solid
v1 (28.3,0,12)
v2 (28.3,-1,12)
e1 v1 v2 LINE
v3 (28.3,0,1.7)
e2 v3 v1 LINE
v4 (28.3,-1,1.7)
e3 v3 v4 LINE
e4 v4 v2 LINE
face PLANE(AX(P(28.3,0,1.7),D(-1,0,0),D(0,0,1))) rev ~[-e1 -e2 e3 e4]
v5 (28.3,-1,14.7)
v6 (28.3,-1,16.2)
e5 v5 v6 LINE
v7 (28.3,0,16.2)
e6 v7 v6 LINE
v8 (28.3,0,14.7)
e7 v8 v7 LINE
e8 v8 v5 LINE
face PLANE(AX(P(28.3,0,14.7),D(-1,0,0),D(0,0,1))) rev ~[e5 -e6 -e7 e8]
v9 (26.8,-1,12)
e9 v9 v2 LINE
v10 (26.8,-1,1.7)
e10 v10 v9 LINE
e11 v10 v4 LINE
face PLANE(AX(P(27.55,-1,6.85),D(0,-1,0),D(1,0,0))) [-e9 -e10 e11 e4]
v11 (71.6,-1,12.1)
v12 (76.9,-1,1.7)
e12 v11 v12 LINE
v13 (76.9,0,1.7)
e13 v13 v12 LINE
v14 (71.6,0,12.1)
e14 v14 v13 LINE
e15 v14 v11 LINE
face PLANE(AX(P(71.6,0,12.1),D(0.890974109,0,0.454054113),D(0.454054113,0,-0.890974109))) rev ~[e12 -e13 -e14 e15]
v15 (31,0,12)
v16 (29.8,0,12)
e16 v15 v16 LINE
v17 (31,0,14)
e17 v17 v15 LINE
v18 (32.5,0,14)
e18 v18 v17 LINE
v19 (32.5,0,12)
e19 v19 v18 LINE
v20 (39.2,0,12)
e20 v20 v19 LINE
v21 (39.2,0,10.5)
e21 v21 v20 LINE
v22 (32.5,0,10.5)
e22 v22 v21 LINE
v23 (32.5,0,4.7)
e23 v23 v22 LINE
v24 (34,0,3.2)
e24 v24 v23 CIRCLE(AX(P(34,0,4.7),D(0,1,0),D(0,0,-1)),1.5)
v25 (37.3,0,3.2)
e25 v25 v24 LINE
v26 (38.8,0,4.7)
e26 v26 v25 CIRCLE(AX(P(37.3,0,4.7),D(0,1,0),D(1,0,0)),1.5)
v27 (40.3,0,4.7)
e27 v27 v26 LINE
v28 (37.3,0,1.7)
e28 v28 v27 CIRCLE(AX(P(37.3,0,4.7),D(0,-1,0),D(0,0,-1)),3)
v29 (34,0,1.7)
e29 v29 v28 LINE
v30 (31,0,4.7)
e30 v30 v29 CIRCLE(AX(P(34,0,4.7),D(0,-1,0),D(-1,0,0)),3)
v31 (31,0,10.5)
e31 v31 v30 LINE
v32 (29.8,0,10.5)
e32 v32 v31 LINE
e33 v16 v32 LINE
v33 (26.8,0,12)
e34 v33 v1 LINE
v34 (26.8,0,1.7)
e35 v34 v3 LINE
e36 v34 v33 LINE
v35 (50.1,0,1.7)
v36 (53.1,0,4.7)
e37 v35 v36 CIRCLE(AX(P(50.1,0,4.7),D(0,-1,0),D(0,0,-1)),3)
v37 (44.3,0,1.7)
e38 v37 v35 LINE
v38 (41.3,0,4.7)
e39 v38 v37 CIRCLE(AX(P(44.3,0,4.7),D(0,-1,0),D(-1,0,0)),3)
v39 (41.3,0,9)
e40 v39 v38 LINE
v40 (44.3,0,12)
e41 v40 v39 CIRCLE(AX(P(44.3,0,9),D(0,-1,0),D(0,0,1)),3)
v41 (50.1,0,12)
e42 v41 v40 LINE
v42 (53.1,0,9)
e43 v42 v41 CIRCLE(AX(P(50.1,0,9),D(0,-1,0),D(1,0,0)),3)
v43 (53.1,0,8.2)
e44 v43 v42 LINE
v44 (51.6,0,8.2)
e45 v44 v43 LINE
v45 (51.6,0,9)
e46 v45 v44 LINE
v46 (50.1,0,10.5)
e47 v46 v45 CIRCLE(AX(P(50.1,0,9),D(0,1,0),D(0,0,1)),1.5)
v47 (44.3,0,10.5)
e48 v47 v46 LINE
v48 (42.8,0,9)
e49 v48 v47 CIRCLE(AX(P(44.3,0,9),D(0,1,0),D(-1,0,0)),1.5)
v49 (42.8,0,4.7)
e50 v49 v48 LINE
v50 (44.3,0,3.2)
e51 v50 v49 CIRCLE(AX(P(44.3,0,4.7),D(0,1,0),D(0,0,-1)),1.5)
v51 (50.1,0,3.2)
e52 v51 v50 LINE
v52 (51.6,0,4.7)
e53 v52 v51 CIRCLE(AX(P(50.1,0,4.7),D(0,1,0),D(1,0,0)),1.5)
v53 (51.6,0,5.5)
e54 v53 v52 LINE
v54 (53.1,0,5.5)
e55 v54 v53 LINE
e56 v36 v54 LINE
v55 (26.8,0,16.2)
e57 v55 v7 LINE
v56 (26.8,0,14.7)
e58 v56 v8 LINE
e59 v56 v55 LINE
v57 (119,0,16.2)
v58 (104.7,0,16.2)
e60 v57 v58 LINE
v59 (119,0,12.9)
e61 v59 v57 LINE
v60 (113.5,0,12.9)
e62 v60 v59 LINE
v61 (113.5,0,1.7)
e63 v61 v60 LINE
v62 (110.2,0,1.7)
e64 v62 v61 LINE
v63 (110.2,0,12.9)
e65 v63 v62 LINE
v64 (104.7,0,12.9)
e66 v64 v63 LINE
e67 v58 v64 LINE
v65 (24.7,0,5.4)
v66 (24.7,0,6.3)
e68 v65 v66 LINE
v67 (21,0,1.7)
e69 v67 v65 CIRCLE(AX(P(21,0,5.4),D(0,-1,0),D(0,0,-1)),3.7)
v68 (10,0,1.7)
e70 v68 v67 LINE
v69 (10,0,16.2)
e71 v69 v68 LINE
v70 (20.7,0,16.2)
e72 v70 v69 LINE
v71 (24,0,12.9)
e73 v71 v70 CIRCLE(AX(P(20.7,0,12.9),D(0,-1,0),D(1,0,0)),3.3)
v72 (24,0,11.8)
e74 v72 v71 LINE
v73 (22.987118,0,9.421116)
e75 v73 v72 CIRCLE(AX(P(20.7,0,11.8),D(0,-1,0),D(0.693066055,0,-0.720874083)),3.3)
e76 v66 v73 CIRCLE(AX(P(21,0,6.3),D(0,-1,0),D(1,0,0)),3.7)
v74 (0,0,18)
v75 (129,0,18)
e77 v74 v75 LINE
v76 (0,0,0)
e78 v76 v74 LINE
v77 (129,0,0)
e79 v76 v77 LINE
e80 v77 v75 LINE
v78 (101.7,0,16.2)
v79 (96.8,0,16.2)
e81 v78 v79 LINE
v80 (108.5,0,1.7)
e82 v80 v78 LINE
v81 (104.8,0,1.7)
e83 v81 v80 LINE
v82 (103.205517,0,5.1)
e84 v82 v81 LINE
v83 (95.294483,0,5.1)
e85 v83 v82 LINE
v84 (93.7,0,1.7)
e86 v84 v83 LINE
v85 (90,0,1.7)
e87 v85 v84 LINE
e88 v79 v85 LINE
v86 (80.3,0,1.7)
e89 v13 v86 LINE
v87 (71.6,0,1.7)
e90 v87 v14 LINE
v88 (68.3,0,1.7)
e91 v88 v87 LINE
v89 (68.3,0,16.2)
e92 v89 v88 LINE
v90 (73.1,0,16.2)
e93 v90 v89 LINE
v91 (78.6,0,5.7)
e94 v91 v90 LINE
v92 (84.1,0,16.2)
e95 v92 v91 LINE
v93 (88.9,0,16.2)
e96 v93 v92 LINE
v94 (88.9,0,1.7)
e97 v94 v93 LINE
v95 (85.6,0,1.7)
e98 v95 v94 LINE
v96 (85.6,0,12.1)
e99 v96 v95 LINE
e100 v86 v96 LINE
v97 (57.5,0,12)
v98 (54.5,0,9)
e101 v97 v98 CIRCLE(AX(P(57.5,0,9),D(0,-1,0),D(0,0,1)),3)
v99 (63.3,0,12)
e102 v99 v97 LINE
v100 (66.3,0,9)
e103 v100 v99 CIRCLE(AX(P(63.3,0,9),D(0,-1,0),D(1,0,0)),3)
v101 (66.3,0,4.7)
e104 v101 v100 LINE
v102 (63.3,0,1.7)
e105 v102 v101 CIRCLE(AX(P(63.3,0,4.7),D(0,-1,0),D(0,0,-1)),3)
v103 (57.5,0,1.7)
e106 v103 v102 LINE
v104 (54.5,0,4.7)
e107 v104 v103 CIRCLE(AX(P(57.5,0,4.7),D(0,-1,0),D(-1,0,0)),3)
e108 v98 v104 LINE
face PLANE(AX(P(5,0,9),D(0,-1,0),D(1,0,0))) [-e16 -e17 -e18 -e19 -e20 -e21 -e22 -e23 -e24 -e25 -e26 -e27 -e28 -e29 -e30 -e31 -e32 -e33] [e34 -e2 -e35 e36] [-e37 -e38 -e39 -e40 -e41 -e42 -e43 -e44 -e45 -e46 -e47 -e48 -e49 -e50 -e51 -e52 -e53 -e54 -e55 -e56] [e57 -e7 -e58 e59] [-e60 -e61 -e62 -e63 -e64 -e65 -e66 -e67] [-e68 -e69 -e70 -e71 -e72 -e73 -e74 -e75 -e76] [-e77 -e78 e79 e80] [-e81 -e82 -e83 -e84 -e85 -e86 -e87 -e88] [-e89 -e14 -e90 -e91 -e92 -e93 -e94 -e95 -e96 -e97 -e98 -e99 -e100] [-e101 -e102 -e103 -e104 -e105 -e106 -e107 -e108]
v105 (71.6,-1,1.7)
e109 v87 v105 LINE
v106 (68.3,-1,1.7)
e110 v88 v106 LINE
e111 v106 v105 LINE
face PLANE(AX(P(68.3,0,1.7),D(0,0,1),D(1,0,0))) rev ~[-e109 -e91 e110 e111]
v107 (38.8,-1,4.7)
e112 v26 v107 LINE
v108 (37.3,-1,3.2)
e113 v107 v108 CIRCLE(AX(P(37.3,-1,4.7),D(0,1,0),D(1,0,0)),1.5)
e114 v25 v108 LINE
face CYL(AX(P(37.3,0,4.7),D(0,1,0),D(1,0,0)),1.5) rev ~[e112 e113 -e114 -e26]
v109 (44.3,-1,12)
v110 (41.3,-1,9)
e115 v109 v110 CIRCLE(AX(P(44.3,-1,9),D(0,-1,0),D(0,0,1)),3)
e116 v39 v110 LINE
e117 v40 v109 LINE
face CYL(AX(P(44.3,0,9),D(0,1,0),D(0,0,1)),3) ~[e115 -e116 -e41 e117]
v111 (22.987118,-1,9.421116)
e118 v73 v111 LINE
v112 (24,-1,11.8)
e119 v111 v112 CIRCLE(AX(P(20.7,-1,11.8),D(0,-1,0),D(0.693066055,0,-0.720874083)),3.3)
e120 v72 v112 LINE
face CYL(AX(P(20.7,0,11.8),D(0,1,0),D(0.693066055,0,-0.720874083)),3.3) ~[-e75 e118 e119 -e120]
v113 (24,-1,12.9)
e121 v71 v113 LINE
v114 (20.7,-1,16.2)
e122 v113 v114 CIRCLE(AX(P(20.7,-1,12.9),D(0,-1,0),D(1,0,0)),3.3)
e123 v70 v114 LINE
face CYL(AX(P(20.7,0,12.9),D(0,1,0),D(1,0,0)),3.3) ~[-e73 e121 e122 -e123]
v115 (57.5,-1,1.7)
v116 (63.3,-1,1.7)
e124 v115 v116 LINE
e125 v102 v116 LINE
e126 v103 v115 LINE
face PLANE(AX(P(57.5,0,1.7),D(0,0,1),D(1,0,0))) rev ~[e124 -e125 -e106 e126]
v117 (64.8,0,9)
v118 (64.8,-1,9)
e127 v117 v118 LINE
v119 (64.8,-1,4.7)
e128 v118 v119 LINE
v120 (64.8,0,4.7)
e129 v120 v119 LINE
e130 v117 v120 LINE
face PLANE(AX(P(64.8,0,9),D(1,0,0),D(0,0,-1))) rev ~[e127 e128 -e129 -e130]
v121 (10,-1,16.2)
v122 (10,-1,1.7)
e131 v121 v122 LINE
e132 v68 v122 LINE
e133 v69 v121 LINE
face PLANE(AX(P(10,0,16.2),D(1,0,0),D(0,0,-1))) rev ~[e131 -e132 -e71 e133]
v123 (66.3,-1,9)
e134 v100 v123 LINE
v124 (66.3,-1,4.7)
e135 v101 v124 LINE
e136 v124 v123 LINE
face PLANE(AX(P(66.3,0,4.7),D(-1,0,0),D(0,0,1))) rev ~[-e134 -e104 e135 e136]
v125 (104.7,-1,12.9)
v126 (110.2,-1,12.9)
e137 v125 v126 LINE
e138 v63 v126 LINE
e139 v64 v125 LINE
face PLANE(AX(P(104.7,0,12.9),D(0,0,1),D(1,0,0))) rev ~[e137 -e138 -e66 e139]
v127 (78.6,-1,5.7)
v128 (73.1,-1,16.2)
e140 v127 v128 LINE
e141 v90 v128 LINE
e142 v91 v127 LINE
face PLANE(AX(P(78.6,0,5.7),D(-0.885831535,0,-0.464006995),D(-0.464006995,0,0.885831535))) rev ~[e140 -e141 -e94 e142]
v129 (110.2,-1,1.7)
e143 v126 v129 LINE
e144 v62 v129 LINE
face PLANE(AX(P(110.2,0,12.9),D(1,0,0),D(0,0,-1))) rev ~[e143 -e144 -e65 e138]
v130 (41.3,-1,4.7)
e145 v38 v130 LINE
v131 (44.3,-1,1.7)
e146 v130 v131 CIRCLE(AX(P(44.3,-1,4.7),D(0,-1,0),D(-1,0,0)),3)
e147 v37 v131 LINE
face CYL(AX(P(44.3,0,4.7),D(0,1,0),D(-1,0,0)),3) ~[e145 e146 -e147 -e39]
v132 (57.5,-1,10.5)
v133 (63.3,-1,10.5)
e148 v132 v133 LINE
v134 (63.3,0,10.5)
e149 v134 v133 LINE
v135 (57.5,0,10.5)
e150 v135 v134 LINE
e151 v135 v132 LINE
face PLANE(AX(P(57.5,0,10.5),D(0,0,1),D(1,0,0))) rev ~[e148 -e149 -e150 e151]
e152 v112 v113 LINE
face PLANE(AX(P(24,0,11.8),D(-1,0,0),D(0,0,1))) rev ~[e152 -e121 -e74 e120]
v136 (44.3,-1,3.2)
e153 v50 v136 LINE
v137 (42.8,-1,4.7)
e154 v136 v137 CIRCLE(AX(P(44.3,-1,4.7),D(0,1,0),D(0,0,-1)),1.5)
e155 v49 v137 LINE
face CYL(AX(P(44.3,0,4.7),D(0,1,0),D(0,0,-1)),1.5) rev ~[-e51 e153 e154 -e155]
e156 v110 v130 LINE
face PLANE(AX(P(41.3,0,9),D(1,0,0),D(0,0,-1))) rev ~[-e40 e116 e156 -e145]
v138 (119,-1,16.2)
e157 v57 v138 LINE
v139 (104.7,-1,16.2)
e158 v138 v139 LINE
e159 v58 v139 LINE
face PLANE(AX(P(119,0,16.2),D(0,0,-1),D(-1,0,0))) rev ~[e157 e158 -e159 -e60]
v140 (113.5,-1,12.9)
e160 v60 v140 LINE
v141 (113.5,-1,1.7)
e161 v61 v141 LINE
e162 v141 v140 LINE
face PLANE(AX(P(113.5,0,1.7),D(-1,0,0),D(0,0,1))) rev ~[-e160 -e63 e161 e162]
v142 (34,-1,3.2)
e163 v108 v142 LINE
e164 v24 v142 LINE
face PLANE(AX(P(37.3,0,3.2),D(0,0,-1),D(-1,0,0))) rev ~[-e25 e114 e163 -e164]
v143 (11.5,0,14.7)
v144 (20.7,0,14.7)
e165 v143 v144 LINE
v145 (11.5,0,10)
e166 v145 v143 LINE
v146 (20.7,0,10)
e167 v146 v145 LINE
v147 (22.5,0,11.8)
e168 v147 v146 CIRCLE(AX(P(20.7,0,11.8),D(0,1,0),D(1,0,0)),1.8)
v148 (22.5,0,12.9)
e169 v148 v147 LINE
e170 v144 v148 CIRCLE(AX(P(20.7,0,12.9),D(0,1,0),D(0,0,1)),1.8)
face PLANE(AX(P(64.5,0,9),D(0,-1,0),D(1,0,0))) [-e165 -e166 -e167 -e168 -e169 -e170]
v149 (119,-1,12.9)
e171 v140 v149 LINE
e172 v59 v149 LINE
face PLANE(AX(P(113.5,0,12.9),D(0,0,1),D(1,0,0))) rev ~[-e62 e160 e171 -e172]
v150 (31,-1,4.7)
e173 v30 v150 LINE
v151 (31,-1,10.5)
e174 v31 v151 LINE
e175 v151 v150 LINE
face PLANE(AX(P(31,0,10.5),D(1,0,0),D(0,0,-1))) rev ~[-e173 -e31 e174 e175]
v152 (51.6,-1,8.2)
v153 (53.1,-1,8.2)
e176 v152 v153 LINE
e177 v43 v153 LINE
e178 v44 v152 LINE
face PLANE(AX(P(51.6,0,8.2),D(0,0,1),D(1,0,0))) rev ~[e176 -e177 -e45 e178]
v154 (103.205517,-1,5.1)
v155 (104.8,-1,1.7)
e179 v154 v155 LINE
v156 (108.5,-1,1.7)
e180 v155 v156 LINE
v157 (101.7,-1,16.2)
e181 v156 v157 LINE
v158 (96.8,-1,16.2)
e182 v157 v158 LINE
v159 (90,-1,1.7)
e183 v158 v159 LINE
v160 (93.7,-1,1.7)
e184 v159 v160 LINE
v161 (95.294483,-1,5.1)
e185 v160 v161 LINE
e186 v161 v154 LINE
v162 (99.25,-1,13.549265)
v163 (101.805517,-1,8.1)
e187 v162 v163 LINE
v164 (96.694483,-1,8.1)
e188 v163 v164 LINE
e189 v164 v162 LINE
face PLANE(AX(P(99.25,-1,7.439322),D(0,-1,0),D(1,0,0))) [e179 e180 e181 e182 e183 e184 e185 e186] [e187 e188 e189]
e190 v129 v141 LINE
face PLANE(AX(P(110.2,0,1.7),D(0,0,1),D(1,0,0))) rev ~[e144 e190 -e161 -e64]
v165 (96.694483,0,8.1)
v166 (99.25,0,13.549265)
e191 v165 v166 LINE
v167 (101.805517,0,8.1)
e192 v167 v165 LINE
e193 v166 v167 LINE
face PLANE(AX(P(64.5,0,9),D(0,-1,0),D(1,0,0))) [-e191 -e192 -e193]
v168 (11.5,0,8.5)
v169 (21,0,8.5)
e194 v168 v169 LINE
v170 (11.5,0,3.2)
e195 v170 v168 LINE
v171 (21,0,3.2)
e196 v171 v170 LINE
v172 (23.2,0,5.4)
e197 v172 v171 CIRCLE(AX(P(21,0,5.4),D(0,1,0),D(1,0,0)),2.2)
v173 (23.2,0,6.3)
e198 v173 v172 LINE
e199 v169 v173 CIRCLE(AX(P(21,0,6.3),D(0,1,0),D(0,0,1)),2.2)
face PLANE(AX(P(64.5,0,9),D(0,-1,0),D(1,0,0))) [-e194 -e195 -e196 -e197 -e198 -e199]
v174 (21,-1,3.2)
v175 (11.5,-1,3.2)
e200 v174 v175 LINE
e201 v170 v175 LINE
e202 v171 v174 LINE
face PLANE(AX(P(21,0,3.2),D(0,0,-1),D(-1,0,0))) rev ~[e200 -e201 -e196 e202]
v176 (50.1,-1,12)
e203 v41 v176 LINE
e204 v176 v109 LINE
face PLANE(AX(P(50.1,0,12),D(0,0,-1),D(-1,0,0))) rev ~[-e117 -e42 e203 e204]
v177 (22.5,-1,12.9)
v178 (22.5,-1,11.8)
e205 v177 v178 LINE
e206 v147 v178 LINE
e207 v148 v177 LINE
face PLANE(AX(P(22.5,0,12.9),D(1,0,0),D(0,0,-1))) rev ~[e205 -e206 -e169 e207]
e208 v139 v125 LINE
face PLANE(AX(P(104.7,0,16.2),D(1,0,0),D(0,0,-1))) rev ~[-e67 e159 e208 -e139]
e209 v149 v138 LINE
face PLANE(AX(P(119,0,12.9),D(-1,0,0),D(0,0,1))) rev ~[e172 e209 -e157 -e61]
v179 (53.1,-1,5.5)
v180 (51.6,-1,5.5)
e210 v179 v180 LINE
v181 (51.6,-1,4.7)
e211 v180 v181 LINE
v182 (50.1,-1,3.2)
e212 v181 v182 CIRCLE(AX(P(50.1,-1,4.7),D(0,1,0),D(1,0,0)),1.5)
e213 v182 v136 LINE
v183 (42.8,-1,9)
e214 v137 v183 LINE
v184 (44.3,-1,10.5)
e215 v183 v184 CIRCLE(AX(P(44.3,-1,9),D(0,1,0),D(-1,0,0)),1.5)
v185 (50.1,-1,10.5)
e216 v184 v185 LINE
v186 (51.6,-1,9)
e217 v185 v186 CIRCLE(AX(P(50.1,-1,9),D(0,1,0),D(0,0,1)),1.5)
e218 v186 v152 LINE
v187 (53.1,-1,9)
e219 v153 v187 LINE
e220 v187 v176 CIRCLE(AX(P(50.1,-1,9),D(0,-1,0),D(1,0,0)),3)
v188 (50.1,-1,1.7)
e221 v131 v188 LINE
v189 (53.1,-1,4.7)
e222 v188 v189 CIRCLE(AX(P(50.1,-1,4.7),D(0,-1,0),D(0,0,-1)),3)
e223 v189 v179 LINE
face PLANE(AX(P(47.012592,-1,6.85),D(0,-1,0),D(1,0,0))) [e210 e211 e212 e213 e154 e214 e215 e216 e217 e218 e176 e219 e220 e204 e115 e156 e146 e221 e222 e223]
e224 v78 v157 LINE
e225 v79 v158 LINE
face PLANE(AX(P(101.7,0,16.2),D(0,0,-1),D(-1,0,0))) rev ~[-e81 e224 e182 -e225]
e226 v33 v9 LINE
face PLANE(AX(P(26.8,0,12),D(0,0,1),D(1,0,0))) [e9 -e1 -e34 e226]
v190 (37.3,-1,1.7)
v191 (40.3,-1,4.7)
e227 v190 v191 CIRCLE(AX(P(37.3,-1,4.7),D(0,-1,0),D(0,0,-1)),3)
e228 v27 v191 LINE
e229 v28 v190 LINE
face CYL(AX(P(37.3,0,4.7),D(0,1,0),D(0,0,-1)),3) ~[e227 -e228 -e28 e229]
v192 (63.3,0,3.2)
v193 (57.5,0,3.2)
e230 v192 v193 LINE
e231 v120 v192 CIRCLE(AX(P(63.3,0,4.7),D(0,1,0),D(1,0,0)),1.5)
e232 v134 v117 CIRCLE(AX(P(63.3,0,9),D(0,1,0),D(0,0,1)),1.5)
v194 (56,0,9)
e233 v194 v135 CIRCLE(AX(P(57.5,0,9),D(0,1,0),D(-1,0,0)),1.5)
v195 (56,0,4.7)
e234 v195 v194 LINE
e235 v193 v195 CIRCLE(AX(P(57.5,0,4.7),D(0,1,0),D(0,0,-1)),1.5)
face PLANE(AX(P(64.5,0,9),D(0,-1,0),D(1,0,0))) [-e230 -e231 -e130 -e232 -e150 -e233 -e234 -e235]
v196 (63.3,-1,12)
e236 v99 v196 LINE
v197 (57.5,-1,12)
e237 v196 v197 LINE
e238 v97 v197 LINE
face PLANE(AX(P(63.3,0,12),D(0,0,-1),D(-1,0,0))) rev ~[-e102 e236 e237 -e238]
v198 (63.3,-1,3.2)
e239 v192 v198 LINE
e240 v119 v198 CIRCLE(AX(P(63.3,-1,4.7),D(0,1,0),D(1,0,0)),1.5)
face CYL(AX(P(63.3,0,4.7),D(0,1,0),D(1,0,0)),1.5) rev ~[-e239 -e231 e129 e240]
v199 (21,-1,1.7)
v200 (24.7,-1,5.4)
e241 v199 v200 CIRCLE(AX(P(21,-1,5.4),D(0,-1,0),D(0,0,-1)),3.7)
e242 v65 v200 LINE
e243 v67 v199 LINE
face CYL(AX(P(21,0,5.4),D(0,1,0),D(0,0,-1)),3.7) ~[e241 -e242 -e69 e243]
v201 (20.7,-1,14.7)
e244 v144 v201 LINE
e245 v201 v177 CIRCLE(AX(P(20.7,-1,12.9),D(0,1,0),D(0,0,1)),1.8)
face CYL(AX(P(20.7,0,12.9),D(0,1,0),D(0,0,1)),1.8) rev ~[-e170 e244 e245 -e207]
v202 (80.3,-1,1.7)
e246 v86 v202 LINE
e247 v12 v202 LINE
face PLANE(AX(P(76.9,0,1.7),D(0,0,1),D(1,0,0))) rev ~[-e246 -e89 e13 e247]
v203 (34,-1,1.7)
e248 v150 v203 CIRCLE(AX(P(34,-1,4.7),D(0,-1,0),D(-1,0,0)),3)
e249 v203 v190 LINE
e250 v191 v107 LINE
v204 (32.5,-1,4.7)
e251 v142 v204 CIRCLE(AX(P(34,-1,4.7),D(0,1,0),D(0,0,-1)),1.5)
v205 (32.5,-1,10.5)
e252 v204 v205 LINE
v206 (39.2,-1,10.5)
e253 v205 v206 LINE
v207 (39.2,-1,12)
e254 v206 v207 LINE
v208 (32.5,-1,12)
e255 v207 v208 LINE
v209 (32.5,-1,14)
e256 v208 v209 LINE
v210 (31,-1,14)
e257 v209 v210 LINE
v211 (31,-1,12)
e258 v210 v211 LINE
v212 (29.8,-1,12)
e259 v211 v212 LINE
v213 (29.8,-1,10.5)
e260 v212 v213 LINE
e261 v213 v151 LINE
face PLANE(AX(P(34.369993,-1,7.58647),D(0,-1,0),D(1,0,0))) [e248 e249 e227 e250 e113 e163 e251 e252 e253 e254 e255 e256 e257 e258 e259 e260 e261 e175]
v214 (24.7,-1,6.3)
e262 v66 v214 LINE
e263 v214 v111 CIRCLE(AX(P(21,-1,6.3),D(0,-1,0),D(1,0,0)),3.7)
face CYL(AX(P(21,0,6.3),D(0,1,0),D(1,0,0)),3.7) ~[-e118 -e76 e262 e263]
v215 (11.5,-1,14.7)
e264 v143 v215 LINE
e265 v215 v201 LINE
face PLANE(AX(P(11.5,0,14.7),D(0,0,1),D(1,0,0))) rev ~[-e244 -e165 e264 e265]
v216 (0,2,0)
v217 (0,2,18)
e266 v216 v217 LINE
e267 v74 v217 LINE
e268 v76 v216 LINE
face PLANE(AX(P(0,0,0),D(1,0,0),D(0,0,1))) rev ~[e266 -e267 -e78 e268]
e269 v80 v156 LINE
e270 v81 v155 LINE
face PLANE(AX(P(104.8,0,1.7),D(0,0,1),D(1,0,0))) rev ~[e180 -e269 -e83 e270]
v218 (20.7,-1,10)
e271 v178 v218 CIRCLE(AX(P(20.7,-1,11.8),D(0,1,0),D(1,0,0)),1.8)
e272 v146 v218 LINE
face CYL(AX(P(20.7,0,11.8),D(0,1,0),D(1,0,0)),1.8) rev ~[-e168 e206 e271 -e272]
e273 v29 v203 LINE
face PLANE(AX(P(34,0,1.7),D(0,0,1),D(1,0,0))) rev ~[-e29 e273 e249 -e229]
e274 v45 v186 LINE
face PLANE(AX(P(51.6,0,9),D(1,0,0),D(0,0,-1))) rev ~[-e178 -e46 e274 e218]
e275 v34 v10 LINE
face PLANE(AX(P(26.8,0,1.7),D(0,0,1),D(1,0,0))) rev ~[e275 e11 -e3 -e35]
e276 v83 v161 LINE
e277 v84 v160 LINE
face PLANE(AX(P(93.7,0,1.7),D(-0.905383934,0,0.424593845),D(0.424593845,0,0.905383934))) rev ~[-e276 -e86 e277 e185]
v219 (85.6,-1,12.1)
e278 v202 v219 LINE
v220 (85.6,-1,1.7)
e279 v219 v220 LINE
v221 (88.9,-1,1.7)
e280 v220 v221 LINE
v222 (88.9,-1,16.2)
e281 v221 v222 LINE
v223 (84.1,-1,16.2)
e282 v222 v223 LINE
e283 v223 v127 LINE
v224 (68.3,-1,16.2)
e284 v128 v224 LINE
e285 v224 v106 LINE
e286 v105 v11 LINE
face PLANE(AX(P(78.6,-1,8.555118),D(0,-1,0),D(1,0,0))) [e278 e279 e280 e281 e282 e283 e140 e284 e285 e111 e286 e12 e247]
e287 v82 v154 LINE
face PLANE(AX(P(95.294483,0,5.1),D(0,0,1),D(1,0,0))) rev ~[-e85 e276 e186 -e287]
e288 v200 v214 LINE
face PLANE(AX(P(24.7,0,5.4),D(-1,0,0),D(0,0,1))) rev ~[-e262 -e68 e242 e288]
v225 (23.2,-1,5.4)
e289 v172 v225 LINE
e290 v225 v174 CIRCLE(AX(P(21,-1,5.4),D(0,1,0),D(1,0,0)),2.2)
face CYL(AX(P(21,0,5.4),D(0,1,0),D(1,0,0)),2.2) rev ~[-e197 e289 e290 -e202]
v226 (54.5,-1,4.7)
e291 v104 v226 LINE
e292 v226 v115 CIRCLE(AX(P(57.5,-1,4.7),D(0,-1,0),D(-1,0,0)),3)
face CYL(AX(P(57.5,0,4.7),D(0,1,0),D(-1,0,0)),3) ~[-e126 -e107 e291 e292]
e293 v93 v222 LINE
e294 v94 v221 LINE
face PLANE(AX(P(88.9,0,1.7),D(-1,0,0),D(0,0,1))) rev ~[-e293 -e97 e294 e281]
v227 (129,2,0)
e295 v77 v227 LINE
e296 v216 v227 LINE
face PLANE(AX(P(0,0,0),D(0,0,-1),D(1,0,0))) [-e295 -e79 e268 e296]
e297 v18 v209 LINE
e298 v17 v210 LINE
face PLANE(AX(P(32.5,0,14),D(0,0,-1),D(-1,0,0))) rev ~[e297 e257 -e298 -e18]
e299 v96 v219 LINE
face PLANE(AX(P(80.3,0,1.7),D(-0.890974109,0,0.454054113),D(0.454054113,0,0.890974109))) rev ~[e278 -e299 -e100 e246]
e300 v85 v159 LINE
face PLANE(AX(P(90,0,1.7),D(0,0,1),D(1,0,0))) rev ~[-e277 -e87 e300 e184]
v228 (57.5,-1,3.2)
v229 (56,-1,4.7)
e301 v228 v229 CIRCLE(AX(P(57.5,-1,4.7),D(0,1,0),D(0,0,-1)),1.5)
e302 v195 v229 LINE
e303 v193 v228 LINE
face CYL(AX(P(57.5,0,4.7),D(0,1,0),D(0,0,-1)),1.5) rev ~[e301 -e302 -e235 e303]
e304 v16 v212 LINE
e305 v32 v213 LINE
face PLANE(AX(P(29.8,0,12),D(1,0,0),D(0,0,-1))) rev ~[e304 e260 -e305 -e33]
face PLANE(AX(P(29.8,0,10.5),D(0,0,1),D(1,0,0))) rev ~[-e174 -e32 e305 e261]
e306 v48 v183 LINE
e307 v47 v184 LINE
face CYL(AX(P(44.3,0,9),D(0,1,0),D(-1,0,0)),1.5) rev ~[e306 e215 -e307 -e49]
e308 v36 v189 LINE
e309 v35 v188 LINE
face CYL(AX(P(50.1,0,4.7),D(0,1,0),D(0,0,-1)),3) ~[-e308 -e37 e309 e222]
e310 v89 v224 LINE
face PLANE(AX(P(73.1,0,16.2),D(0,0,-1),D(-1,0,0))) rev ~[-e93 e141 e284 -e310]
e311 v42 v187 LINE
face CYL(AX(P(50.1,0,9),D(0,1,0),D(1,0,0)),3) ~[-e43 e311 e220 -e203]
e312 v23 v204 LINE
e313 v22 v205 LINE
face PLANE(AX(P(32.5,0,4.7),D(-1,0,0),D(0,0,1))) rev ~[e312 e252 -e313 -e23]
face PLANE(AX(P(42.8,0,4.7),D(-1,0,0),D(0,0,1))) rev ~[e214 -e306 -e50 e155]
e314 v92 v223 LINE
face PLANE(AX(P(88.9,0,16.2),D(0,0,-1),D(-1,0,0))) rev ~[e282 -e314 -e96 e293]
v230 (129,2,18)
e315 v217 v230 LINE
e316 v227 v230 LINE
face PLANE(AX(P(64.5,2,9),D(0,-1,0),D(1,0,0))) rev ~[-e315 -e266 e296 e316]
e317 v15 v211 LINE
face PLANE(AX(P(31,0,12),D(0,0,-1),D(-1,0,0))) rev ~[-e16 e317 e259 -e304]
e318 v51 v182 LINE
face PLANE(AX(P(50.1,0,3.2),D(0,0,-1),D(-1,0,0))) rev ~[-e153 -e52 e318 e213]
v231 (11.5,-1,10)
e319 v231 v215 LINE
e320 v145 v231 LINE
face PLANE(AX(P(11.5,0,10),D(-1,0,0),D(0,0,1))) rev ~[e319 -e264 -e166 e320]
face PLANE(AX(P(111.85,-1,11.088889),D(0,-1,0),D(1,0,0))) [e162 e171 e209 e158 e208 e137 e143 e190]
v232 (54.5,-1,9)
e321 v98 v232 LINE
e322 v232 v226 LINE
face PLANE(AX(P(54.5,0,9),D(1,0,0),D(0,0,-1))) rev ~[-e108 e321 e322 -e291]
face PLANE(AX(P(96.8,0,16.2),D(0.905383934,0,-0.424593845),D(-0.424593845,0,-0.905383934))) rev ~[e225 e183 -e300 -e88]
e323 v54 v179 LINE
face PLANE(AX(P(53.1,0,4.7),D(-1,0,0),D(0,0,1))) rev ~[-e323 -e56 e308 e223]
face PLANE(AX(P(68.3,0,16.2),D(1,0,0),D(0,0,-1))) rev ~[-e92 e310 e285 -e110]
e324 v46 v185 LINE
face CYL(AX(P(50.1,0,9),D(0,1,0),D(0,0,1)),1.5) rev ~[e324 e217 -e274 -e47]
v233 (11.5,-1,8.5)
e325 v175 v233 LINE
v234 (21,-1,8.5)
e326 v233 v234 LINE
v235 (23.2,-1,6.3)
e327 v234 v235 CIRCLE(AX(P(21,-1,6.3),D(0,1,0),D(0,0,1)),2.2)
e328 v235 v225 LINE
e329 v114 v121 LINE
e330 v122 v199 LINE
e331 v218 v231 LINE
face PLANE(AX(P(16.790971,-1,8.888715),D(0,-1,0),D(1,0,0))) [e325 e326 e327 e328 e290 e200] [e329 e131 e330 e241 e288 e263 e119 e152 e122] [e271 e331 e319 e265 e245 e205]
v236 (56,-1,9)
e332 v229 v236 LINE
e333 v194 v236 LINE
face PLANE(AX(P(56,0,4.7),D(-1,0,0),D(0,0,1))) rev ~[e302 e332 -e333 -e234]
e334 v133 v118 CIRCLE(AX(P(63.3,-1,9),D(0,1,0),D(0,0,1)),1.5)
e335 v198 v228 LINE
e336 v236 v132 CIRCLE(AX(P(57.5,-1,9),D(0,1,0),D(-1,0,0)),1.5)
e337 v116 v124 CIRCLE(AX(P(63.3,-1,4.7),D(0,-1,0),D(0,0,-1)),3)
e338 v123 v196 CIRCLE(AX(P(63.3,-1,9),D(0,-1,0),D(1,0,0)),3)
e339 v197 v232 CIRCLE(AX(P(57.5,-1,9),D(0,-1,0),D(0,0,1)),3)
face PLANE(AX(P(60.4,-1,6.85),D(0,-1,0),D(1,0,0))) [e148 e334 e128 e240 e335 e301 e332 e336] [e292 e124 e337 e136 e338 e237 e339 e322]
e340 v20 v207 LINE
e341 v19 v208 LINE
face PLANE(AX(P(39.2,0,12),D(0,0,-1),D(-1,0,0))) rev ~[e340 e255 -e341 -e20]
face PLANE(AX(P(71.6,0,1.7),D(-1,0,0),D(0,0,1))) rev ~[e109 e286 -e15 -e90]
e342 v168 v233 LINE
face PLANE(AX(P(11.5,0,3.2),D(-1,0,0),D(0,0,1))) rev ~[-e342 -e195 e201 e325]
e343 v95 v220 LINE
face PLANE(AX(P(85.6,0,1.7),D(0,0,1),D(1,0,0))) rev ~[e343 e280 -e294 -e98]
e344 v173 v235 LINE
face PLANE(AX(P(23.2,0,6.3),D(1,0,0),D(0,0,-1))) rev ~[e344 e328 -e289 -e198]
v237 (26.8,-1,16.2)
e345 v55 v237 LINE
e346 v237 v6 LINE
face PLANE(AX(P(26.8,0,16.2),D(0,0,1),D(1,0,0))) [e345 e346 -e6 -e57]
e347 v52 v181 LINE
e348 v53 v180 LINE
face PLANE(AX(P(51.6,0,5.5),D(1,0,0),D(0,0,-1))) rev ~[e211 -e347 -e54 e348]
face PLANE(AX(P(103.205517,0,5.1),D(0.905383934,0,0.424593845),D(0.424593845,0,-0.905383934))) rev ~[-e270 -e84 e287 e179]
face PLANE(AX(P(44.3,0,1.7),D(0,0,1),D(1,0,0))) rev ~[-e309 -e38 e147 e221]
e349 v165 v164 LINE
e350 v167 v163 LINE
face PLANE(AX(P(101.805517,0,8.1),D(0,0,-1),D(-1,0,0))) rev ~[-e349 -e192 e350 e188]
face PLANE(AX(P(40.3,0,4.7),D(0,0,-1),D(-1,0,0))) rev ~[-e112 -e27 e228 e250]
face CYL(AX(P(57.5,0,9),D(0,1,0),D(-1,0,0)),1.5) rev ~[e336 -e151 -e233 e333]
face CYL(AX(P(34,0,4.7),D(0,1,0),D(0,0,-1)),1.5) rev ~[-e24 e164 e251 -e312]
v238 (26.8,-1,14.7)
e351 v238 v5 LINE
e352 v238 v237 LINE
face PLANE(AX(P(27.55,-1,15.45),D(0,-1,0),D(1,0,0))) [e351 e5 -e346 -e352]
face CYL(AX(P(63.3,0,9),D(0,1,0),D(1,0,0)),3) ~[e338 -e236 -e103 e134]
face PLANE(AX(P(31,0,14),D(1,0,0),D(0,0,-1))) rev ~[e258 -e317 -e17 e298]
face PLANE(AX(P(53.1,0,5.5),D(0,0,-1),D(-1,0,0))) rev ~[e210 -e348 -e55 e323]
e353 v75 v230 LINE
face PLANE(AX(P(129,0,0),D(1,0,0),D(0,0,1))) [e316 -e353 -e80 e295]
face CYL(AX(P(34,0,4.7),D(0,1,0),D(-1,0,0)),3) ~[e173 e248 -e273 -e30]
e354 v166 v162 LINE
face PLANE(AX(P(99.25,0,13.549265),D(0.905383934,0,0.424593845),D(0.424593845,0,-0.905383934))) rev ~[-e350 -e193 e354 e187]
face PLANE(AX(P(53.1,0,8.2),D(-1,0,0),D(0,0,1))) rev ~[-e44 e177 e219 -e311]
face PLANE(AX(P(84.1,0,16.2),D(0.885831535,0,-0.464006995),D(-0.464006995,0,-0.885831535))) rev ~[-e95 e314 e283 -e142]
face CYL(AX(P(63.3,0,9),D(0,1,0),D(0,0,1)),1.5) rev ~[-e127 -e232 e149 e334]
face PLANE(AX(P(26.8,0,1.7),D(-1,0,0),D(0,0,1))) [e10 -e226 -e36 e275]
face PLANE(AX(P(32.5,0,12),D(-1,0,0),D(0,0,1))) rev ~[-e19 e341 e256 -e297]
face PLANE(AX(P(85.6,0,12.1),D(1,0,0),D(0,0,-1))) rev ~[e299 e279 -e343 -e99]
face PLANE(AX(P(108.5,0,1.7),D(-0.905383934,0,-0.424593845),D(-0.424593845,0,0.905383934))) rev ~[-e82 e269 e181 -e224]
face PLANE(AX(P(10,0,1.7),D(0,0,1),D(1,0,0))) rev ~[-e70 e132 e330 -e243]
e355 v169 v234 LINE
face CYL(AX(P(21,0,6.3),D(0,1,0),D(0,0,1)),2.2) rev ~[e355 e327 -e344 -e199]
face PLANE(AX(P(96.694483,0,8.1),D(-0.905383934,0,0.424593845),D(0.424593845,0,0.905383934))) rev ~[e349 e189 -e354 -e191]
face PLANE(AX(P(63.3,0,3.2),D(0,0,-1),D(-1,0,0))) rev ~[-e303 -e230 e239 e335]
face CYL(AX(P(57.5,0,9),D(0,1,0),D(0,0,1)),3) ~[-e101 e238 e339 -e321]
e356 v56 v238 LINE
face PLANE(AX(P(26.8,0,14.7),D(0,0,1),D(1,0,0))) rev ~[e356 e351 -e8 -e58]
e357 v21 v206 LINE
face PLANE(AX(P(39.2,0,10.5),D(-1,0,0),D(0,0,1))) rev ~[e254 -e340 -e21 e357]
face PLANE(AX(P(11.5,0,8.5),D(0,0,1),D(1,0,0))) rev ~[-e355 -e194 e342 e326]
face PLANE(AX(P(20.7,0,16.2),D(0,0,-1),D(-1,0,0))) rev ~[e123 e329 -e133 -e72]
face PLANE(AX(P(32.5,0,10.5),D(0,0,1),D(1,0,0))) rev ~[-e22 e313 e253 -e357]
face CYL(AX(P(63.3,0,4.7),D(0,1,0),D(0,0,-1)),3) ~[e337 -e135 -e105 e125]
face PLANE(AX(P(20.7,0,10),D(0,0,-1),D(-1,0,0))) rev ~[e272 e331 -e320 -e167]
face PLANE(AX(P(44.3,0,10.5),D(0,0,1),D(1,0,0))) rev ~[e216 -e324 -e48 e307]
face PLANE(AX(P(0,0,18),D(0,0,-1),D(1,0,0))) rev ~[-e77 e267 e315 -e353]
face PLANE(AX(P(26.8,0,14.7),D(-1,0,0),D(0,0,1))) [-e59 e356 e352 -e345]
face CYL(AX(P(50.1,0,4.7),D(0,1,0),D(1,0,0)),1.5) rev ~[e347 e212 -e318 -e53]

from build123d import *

# Parameters (mm, degrees)
F0_W     = 129
F0_H     = 18
F0_W_2   = 1.5
F0_H_2   = 10.3
F0_R     = 2.1
F0_H_3   = 1.5
F1_DEPTH = 2
F2_DEPTH = 1
F3_R     = 2.1
F4_DEPTH = 2


with BuildPart() as f1:
    # F0 (on Front) → F1 (new body)
    with BuildSketch(Plane.XZ):
        with Locations((64.5, 9)):
            Rectangle(F0_W, F0_H)
        with Locations((27.55, 6.85)):
            Rectangle(F0_W_2, F0_H_2, mode=Mode.SUBTRACT)
        with BuildLine():
            Line((10, 1.7), (10, 16.2))
            Line((10, 16.2), (20.7, 16.2))
            ThreePointArc((20.7, 16.2), (23.0334523779, 15.2334523779), (24, 12.9))
            Line((24, 12.9), (24, 11.8))
            ThreePointArc((24, 11.8), (23.7362385725, 10.5072295908), (22.9871179813, 9.4211155263))
            ThreePointArc((22.9871179813, 9.4211155263), (24.2436350389, 8.0801212696), (24.7, 6.3))
            Line((24.7, 6.3), (24.7, 5.4))
            ThreePointArc((24.7, 5.4), (23.6162950904, 2.7837049096), (21, 1.7))
            Line((21, 1.7), (10, 1.7))
        make_face(mode=Mode.SUBTRACT)
        with BuildLine():
            Line((32.5, 10.5), (32.5, 4.7))
            ThreePointArc((32.5, 4.7), (32.9393398282, 3.6393398282), (34, 3.2))
            Line((34, 3.2), (37.3, 3.2))
            ThreePointArc((37.3, 3.2), (38.3606601718, 3.6393398282), (38.8, 4.7))
            Line((38.8, 4.7), (40.3, 4.7))
            ThreePointArc((40.3, 4.7), (39.4213203436, 2.5786796564), (37.3, 1.7))
            Line((37.3, 1.7), (34, 1.7))
            ThreePointArc((34, 1.7), (31.8786796564, 2.5786796564), (31, 4.7))
            Line((31, 4.7), (31, 10.5))
            Line((31, 10.5), (29.8, 10.5))
            Line((29.8, 10.5), (29.8, 12))
            Line((29.8, 12), (31, 12))
            Line((31, 12), (31, 14))
            Line((31, 14), (32.5, 14))
            Line((32.5, 14), (32.5, 12))
            Line((32.5, 12), (39.2, 12))
            Line((39.2, 12), (39.2, 10.5))
            Line((39.2, 10.5), (32.5, 10.5))
        make_face(mode=Mode.SUBTRACT)
        with BuildLine():
            Line((50.1, 10.5), (44.3, 10.5))
            ThreePointArc((44.3, 10.5), (43.2393398282, 10.0606601718), (42.8, 9))
            Line((42.8, 9), (42.8, 4.7))
            ThreePointArc((42.8, 4.7), (43.2393398282, 3.6393398282), (44.3, 3.2))
            Line((44.3, 3.2), (50.1, 3.2))
            ThreePointArc((50.1, 3.2), (51.1606601718, 3.6393398282), (51.6, 4.7))
            Line((51.6, 4.7), (51.6, 5.5))
            Line((51.6, 5.5), (53.1, 5.5))
            Line((53.1, 5.5), (53.1, 4.7))
            ThreePointArc((53.1, 4.7), (52.2213203436, 2.5786796564), (50.1, 1.7))
            Line((50.1, 1.7), (44.3, 1.7))
            ThreePointArc((44.3, 1.7), (42.1786796564, 2.5786796564), (41.3, 4.7))
            Line((41.3, 4.7), (41.3, 9))
            ThreePointArc((41.3, 9), (42.1786796564, 11.1213203436), (44.3, 12))
            Line((44.3, 12), (50.1, 12))
            ThreePointArc((50.1, 12), (52.2213203436, 11.1213203436), (53.1, 9))
            Line((53.1, 9), (53.1, 8.2))
            Line((53.1, 8.2), (51.6, 8.2))
            Line((51.6, 8.2), (51.6, 9))
            ThreePointArc((51.6, 9), (51.1606601718, 10.0606601718), (50.1, 10.5))
        make_face(mode=Mode.SUBTRACT)
        with BuildLine():
            ThreePointArc((54.5, 9), (55.3786796564, 11.1213203436), (57.5, 12))
            Line((57.5, 12), (63.3, 12))
            ThreePointArc((63.3, 12), (65.4213203436, 11.1213203436), (66.3, 9))
            Line((66.3, 9), (66.3, 4.7))
            ThreePointArc((66.3, 4.7), (65.4213203436, 2.5786796564), (63.3, 1.7))
            Line((63.3, 1.7), (57.5, 1.7))
            ThreePointArc((57.5, 1.7), (55.3786796564, 2.5786796564), (54.5, 4.7))
            Line((54.5, 4.7), (54.5, 9))
        make_face(mode=Mode.SUBTRACT)
        Polygon((71.6, 12.1), (71.6, 1.7), (68.3, 1.7), (68.3, 16.2), (73.1, 16.2), (78.6, 5.7), (84.1, 16.2), (88.9, 16.2), (88.9, 1.7), (85.6, 1.7), (85.6, 12.1), (80.3, 1.7), (76.9, 1.7), align=None, mode=Mode.SUBTRACT)
        Polygon((93.7, 1.7), (90, 1.7), (96.8, 16.2), (101.7, 16.2), (108.5, 1.7), (104.8, 1.7), (103.2055172414, 5.1), (95.2944827586, 5.1), align=None, mode=Mode.SUBTRACT)
        Polygon((104.7, 12.9), (104.7, 16.2), (119, 16.2), (119, 12.9), (113.5, 12.9), (113.5, 1.7), (110.2, 1.7), (110.2, 12.9), align=None, mode=Mode.SUBTRACT)
        with Locations((5, 9)):
            Circle(F0_R, mode=Mode.SUBTRACT)
        with Locations((27.55, 15.45)):
            Rectangle(F0_W_2, F0_H_3, mode=Mode.SUBTRACT)
        with Locations((124, 9)):
            Circle(F0_R, mode=Mode.SUBTRACT)
        with BuildLine():
            Line((20.7, 16.2), (10, 16.2))
            Line((10, 16.2), (10, 1.7))
            Line((10, 1.7), (21, 1.7))
            ThreePointArc((21, 1.7), (23.6162950904, 2.7837049096), (24.7, 5.4))
            Line((24.7, 5.4), (24.7, 6.3))
            ThreePointArc((24.7, 6.3), (24.2436350389, 8.0801212696), (22.9871179813, 9.4211155263))
            ThreePointArc((22.9871179813, 9.4211155263), (23.7362385725, 10.5072295908), (24, 11.8))
            Line((24, 11.8), (24, 12.9))
            ThreePointArc((24, 12.9), (23.0334523779, 15.2334523779), (20.7, 16.2))
        make_face()
        with BuildLine():
            Line((11.5, 8.5), (21, 8.5))
            ThreePointArc((21, 8.5), (22.5556349186, 7.8556349186), (23.2, 6.3))
            Line((23.2, 6.3), (23.2, 5.4))
            ThreePointArc((23.2, 5.4), (22.5556349186, 3.8443650814), (21, 3.2))
            Line((21, 3.2), (11.5, 3.2))
            Line((11.5, 3.2), (11.5, 8.5))
        make_face(mode=Mode.SUBTRACT)
        with BuildLine():
            Line((11.5, 14.7), (20.7, 14.7))
            ThreePointArc((20.7, 14.7), (21.9727922061, 14.1727922061), (22.5, 12.9))
            Line((22.5, 12.9), (22.5, 11.8))
            ThreePointArc((22.5, 11.8), (21.9727922061, 10.5272077939), (20.7, 10))
            Line((20.7, 10), (11.5, 10))
            Line((11.5, 10), (11.5, 14.7))
        make_face(mode=Mode.SUBTRACT)
        Polygon((68.3, 1.7), (71.6, 1.7), (71.6, 12.1), (76.9, 1.7), (80.3, 1.7), (85.6, 12.1), (85.6, 1.7), (88.9, 1.7), (88.9, 16.2), (84.1, 16.2), (78.6, 5.7), (73.1, 16.2), (68.3, 16.2), align=None)
        Polygon((96.8, 16.2), (90, 1.7), (93.7, 1.7), (95.2944827586, 5.1), (103.2055172414, 5.1), (104.8, 1.7), (108.5, 1.7), (101.7, 16.2), align=None)
        Polygon((99.25, 13.5492647059), (101.8055172414, 8.1), (96.6944827586, 8.1), align=None, mode=Mode.SUBTRACT)
        with BuildLine():
            Line((63.3, 12), (57.5, 12))
            ThreePointArc((57.5, 12), (55.3786796564, 11.1213203436), (54.5, 9))
            Line((54.5, 9), (54.5, 4.7))
            ThreePointArc((54.5, 4.7), (55.3786796564, 2.5786796564), (57.5, 1.7))
            Line((57.5, 1.7), (63.3, 1.7))
            ThreePointArc((63.3, 1.7), (65.4213203436, 2.5786796564), (66.3, 4.7))
            Line((66.3, 4.7), (66.3, 9))
            ThreePointArc((66.3, 9), (65.4213203436, 11.1213203436), (63.3, 12))
        make_face()
        with BuildLine():
            ThreePointArc((56, 9), (56.4393398282, 10.0606601718), (57.5, 10.5))
            Line((57.5, 10.5), (63.3, 10.5))
            ThreePointArc((63.3, 10.5), (64.3606601718, 10.0606601718), (64.8, 9))
            Line((64.8, 9), (64.8, 4.7))
            ThreePointArc((64.8, 4.7), (64.3606601718, 3.6393398282), (63.3, 3.2))
            Line((63.3, 3.2), (57.5, 3.2))
            ThreePointArc((57.5, 3.2), (56.4393398282, 3.6393398282), (56, 4.7))
            Line((56, 4.7), (56, 9))
        make_face(mode=Mode.SUBTRACT)
        Polygon((119, 16.2), (104.7, 16.2), (104.7, 12.9), (110.2, 12.9), (110.2, 1.7), (113.5, 1.7), (113.5, 12.9), (119, 12.9), align=None)
        with BuildLine():
            Line((63.3, 10.5), (57.5, 10.5))
            ThreePointArc((57.5, 10.5), (56.4393398282, 10.0606601718), (56, 9))
            Line((56, 9), (56, 4.7))
            ThreePointArc((56, 4.7), (56.4393398282, 3.6393398282), (57.5, 3.2))
            Line((57.5, 3.2), (63.3, 3.2))
            ThreePointArc((63.3, 3.2), (64.3606601718, 3.6393398282), (64.8, 4.7))
            Line((64.8, 4.7), (64.8, 9))
            ThreePointArc((64.8, 9), (64.3606601718, 10.0606601718), (63.3, 10.5))
        make_face()
        with BuildLine():
            ThreePointArc((23.2, 6.3), (22.5556349186, 7.8556349186), (21, 8.5))
            Line((21, 8.5), (11.5, 8.5))
            Line((11.5, 8.5), (11.5, 3.2))
            Line((11.5, 3.2), (21, 3.2))
            ThreePointArc((21, 3.2), (22.5556349186, 3.8443650814), (23.2, 5.4))
            Line((23.2, 5.4), (23.2, 6.3))
        make_face()
        with BuildLine():
            ThreePointArc((22.5, 12.9), (21.9727922061, 14.1727922061), (20.7, 14.7))
            Line((20.7, 14.7), (11.5, 14.7))
            Line((11.5, 14.7), (11.5, 10))
            Line((11.5, 10), (20.7, 10))
            ThreePointArc((20.7, 10), (21.9727922061, 10.5272077939), (22.5, 11.8))
            Line((22.5, 11.8), (22.5, 12.9))
        make_face()
        with BuildLine():
            ThreePointArc((42.8, 9), (43.2393398282, 10.0606601718), (44.3, 10.5))
            Line((44.3, 10.5), (50.1, 10.5))
            ThreePointArc((50.1, 10.5), (51.1606601718, 10.0606601718), (51.6, 9))
            Line((51.6, 9), (51.6, 8.2))
            Line((51.6, 8.2), (53.1, 8.2))
            Line((53.1, 8.2), (53.1, 9))
            ThreePointArc((53.1, 9), (52.2213203436, 11.1213203436), (50.1, 12))
            Line((50.1, 12), (44.3, 12))
            ThreePointArc((44.3, 12), (42.1786796564, 11.1213203436), (41.3, 9))
            Line((41.3, 9), (41.3, 4.7))
            ThreePointArc((41.3, 4.7), (42.1786796564, 2.5786796564), (44.3, 1.7))
            Line((44.3, 1.7), (50.1, 1.7))
            ThreePointArc((50.1, 1.7), (52.2213203436, 2.5786796564), (53.1, 4.7))
            Line((53.1, 4.7), (53.1, 5.5))
            Line((53.1, 5.5), (51.6, 5.5))
            Line((51.6, 5.5), (51.6, 4.7))
            ThreePointArc((51.6, 4.7), (51.1606601718, 3.6393398282), (50.1, 3.2))
            Line((50.1, 3.2), (44.3, 3.2))
            ThreePointArc((44.3, 3.2), (43.2393398282, 3.6393398282), (42.8, 4.7))
            Line((42.8, 4.7), (42.8, 9))
        make_face()
        with BuildLine():
            ThreePointArc((34, 3.2), (32.9393398282, 3.6393398282), (32.5, 4.7))
            Line((32.5, 4.7), (32.5, 10.5))
            Line((32.5, 10.5), (39.2, 10.5))
            Line((39.2, 10.5), (39.2, 12))
            Line((39.2, 12), (32.5, 12))
            Line((32.5, 12), (32.5, 14))
            Line((32.5, 14), (31, 14))
            Line((31, 14), (31, 12))
            Line((31, 12), (29.8, 12))
            Line((29.8, 12), (29.8, 10.5))
            Line((29.8, 10.5), (31, 10.5))
            Line((31, 10.5), (31, 4.7))
            ThreePointArc((31, 4.7), (31.8786796564, 2.5786796564), (34, 1.7))
            Line((34, 1.7), (37.3, 1.7))
            ThreePointArc((37.3, 1.7), (39.4213203436, 2.5786796564), (40.3, 4.7))
            Line((40.3, 4.7), (38.8, 4.7))
            ThreePointArc((38.8, 4.7), (38.3606601718, 3.6393398282), (37.3, 3.2))
            Line((37.3, 3.2), (34, 3.2))
        make_face()
        with Locations((27.55, 6.85)):
            Rectangle(F0_W_2, F0_H_2)
        Polygon((96.6944827586, 8.1), (101.8055172414, 8.1), (99.25, 13.5492647059), align=None)
        with Locations((27.55, 15.45)):
            Rectangle(F0_W_2, F0_H_3)
    extrude(amount=-F1_DEPTH)

    # F0 (on Front) → F2 (join)
    with BuildSketch(Plane.XZ):
        with BuildLine():
            Line((20.7, 16.2), (10, 16.2))
            Line((10, 16.2), (10, 1.7))
            Line((10, 1.7), (21, 1.7))
            ThreePointArc((21, 1.7), (23.6162950904, 2.7837049096), (24.7, 5.4))
            Line((24.7, 5.4), (24.7, 6.3))
            ThreePointArc((24.7, 6.3), (24.2436350389, 8.0801212696), (22.9871179813, 9.4211155263))
            ThreePointArc((22.9871179813, 9.4211155263), (23.7362385725, 10.5072295908), (24, 11.8))
            Line((24, 11.8), (24, 12.9))
            ThreePointArc((24, 12.9), (23.0334523779, 15.2334523779), (20.7, 16.2))
        make_face()
        with BuildLine():
            Line((11.5, 8.5), (21, 8.5))
            ThreePointArc((21, 8.5), (22.5556349186, 7.8556349186), (23.2, 6.3))
            Line((23.2, 6.3), (23.2, 5.4))
            ThreePointArc((23.2, 5.4), (22.5556349186, 3.8443650814), (21, 3.2))
            Line((21, 3.2), (11.5, 3.2))
            Line((11.5, 3.2), (11.5, 8.5))
        make_face(mode=Mode.SUBTRACT)
        with BuildLine():
            Line((11.5, 14.7), (20.7, 14.7))
            ThreePointArc((20.7, 14.7), (21.9727922061, 14.1727922061), (22.5, 12.9))
            Line((22.5, 12.9), (22.5, 11.8))
            ThreePointArc((22.5, 11.8), (21.9727922061, 10.5272077939), (20.7, 10))
            Line((20.7, 10), (11.5, 10))
            Line((11.5, 10), (11.5, 14.7))
        make_face(mode=Mode.SUBTRACT)
        with Locations((27.55, 6.85)):
            Rectangle(F0_W_2, F0_H_2)
        with Locations((27.55, 15.45)):
            Rectangle(F0_W_2, F0_H_3)
        with BuildLine():
            ThreePointArc((34, 3.2), (32.9393398282, 3.6393398282), (32.5, 4.7))
            Line((32.5, 4.7), (32.5, 10.5))
            Line((32.5, 10.5), (39.2, 10.5))
            Line((39.2, 10.5), (39.2, 12))
            Line((39.2, 12), (32.5, 12))
            Line((32.5, 12), (32.5, 14))
            Line((32.5, 14), (31, 14))
            Line((31, 14), (31, 12))
            Line((31, 12), (29.8, 12))
            Line((29.8, 12), (29.8, 10.5))
            Line((29.8, 10.5), (31, 10.5))
            Line((31, 10.5), (31, 4.7))
            ThreePointArc((31, 4.7), (31.8786796564, 2.5786796564), (34, 1.7))
            Line((34, 1.7), (37.3, 1.7))
            ThreePointArc((37.3, 1.7), (39.4213203436, 2.5786796564), (40.3, 4.7))
            Line((40.3, 4.7), (38.8, 4.7))
            ThreePointArc((38.8, 4.7), (38.3606601718, 3.6393398282), (37.3, 3.2))
            Line((37.3, 3.2), (34, 3.2))
        make_face()
        with BuildLine():
            ThreePointArc((42.8, 9), (43.2393398282, 10.0606601718), (44.3, 10.5))
            Line((44.3, 10.5), (50.1, 10.5))
            ThreePointArc((50.1, 10.5), (51.1606601718, 10.0606601718), (51.6, 9))
            Line((51.6, 9), (51.6, 8.2))
            Line((51.6, 8.2), (53.1, 8.2))
            Line((53.1, 8.2), (53.1, 9))
            ThreePointArc((53.1, 9), (52.2213203436, 11.1213203436), (50.1, 12))
            Line((50.1, 12), (44.3, 12))
            ThreePointArc((44.3, 12), (42.1786796564, 11.1213203436), (41.3, 9))
            Line((41.3, 9), (41.3, 4.7))
            ThreePointArc((41.3, 4.7), (42.1786796564, 2.5786796564), (44.3, 1.7))
            Line((44.3, 1.7), (50.1, 1.7))
            ThreePointArc((50.1, 1.7), (52.2213203436, 2.5786796564), (53.1, 4.7))
            Line((53.1, 4.7), (53.1, 5.5))
            Line((53.1, 5.5), (51.6, 5.5))
            Line((51.6, 5.5), (51.6, 4.7))
            ThreePointArc((51.6, 4.7), (51.1606601718, 3.6393398282), (50.1, 3.2))
            Line((50.1, 3.2), (44.3, 3.2))
            ThreePointArc((44.3, 3.2), (43.2393398282, 3.6393398282), (42.8, 4.7))
            Line((42.8, 4.7), (42.8, 9))
        make_face()
        with BuildLine():
            Line((63.3, 12), (57.5, 12))
            ThreePointArc((57.5, 12), (55.3786796564, 11.1213203436), (54.5, 9))
            Line((54.5, 9), (54.5, 4.7))
            ThreePointArc((54.5, 4.7), (55.3786796564, 2.5786796564), (57.5, 1.7))
            Line((57.5, 1.7), (63.3, 1.7))
            ThreePointArc((63.3, 1.7), (65.4213203436, 2.5786796564), (66.3, 4.7))
            Line((66.3, 4.7), (66.3, 9))
            ThreePointArc((66.3, 9), (65.4213203436, 11.1213203436), (63.3, 12))
        make_face()
        with BuildLine():
            ThreePointArc((56, 9), (56.4393398282, 10.0606601718), (57.5, 10.5))
            Line((57.5, 10.5), (63.3, 10.5))
            ThreePointArc((63.3, 10.5), (64.3606601718, 10.0606601718), (64.8, 9))
            Line((64.8, 9), (64.8, 4.7))
            ThreePointArc((64.8, 4.7), (64.3606601718, 3.6393398282), (63.3, 3.2))
            Line((63.3, 3.2), (57.5, 3.2))
            ThreePointArc((57.5, 3.2), (56.4393398282, 3.6393398282), (56, 4.7))
            Line((56, 4.7), (56, 9))
        make_face(mode=Mode.SUBTRACT)
        Polygon((68.3, 1.7), (71.6, 1.7), (71.6, 12.1), (76.9, 1.7), (80.3, 1.7), (85.6, 12.1), (85.6, 1.7), (88.9, 1.7), (88.9, 16.2), (84.1, 16.2), (78.6, 5.7), (73.1, 16.2), (68.3, 16.2), align=None)
        Polygon((96.8, 16.2), (90, 1.7), (93.7, 1.7), (95.2944827586, 5.1), (103.2055172414, 5.1), (104.8, 1.7), (108.5, 1.7), (101.7, 16.2), align=None)
        Polygon((99.25, 13.5492647059), (101.8055172414, 8.1), (96.6944827586, 8.1), align=None, mode=Mode.SUBTRACT)
        Polygon((119, 16.2), (104.7, 16.2), (104.7, 12.9), (110.2, 12.9), (110.2, 1.7), (113.5, 1.7), (113.5, 12.9), (119, 12.9), align=None)
    extrude(amount=F2_DEPTH)

    # F3 (on face) → F4 (join, through all)
    with BuildSketch(Plane.XZ):
        with Locations((5, 9)):
            Circle(F3_R)
        with Locations((124, 9)):
            Circle(F3_R)
    extrude(amount=-F4_DEPTH)


solid = f1.part
